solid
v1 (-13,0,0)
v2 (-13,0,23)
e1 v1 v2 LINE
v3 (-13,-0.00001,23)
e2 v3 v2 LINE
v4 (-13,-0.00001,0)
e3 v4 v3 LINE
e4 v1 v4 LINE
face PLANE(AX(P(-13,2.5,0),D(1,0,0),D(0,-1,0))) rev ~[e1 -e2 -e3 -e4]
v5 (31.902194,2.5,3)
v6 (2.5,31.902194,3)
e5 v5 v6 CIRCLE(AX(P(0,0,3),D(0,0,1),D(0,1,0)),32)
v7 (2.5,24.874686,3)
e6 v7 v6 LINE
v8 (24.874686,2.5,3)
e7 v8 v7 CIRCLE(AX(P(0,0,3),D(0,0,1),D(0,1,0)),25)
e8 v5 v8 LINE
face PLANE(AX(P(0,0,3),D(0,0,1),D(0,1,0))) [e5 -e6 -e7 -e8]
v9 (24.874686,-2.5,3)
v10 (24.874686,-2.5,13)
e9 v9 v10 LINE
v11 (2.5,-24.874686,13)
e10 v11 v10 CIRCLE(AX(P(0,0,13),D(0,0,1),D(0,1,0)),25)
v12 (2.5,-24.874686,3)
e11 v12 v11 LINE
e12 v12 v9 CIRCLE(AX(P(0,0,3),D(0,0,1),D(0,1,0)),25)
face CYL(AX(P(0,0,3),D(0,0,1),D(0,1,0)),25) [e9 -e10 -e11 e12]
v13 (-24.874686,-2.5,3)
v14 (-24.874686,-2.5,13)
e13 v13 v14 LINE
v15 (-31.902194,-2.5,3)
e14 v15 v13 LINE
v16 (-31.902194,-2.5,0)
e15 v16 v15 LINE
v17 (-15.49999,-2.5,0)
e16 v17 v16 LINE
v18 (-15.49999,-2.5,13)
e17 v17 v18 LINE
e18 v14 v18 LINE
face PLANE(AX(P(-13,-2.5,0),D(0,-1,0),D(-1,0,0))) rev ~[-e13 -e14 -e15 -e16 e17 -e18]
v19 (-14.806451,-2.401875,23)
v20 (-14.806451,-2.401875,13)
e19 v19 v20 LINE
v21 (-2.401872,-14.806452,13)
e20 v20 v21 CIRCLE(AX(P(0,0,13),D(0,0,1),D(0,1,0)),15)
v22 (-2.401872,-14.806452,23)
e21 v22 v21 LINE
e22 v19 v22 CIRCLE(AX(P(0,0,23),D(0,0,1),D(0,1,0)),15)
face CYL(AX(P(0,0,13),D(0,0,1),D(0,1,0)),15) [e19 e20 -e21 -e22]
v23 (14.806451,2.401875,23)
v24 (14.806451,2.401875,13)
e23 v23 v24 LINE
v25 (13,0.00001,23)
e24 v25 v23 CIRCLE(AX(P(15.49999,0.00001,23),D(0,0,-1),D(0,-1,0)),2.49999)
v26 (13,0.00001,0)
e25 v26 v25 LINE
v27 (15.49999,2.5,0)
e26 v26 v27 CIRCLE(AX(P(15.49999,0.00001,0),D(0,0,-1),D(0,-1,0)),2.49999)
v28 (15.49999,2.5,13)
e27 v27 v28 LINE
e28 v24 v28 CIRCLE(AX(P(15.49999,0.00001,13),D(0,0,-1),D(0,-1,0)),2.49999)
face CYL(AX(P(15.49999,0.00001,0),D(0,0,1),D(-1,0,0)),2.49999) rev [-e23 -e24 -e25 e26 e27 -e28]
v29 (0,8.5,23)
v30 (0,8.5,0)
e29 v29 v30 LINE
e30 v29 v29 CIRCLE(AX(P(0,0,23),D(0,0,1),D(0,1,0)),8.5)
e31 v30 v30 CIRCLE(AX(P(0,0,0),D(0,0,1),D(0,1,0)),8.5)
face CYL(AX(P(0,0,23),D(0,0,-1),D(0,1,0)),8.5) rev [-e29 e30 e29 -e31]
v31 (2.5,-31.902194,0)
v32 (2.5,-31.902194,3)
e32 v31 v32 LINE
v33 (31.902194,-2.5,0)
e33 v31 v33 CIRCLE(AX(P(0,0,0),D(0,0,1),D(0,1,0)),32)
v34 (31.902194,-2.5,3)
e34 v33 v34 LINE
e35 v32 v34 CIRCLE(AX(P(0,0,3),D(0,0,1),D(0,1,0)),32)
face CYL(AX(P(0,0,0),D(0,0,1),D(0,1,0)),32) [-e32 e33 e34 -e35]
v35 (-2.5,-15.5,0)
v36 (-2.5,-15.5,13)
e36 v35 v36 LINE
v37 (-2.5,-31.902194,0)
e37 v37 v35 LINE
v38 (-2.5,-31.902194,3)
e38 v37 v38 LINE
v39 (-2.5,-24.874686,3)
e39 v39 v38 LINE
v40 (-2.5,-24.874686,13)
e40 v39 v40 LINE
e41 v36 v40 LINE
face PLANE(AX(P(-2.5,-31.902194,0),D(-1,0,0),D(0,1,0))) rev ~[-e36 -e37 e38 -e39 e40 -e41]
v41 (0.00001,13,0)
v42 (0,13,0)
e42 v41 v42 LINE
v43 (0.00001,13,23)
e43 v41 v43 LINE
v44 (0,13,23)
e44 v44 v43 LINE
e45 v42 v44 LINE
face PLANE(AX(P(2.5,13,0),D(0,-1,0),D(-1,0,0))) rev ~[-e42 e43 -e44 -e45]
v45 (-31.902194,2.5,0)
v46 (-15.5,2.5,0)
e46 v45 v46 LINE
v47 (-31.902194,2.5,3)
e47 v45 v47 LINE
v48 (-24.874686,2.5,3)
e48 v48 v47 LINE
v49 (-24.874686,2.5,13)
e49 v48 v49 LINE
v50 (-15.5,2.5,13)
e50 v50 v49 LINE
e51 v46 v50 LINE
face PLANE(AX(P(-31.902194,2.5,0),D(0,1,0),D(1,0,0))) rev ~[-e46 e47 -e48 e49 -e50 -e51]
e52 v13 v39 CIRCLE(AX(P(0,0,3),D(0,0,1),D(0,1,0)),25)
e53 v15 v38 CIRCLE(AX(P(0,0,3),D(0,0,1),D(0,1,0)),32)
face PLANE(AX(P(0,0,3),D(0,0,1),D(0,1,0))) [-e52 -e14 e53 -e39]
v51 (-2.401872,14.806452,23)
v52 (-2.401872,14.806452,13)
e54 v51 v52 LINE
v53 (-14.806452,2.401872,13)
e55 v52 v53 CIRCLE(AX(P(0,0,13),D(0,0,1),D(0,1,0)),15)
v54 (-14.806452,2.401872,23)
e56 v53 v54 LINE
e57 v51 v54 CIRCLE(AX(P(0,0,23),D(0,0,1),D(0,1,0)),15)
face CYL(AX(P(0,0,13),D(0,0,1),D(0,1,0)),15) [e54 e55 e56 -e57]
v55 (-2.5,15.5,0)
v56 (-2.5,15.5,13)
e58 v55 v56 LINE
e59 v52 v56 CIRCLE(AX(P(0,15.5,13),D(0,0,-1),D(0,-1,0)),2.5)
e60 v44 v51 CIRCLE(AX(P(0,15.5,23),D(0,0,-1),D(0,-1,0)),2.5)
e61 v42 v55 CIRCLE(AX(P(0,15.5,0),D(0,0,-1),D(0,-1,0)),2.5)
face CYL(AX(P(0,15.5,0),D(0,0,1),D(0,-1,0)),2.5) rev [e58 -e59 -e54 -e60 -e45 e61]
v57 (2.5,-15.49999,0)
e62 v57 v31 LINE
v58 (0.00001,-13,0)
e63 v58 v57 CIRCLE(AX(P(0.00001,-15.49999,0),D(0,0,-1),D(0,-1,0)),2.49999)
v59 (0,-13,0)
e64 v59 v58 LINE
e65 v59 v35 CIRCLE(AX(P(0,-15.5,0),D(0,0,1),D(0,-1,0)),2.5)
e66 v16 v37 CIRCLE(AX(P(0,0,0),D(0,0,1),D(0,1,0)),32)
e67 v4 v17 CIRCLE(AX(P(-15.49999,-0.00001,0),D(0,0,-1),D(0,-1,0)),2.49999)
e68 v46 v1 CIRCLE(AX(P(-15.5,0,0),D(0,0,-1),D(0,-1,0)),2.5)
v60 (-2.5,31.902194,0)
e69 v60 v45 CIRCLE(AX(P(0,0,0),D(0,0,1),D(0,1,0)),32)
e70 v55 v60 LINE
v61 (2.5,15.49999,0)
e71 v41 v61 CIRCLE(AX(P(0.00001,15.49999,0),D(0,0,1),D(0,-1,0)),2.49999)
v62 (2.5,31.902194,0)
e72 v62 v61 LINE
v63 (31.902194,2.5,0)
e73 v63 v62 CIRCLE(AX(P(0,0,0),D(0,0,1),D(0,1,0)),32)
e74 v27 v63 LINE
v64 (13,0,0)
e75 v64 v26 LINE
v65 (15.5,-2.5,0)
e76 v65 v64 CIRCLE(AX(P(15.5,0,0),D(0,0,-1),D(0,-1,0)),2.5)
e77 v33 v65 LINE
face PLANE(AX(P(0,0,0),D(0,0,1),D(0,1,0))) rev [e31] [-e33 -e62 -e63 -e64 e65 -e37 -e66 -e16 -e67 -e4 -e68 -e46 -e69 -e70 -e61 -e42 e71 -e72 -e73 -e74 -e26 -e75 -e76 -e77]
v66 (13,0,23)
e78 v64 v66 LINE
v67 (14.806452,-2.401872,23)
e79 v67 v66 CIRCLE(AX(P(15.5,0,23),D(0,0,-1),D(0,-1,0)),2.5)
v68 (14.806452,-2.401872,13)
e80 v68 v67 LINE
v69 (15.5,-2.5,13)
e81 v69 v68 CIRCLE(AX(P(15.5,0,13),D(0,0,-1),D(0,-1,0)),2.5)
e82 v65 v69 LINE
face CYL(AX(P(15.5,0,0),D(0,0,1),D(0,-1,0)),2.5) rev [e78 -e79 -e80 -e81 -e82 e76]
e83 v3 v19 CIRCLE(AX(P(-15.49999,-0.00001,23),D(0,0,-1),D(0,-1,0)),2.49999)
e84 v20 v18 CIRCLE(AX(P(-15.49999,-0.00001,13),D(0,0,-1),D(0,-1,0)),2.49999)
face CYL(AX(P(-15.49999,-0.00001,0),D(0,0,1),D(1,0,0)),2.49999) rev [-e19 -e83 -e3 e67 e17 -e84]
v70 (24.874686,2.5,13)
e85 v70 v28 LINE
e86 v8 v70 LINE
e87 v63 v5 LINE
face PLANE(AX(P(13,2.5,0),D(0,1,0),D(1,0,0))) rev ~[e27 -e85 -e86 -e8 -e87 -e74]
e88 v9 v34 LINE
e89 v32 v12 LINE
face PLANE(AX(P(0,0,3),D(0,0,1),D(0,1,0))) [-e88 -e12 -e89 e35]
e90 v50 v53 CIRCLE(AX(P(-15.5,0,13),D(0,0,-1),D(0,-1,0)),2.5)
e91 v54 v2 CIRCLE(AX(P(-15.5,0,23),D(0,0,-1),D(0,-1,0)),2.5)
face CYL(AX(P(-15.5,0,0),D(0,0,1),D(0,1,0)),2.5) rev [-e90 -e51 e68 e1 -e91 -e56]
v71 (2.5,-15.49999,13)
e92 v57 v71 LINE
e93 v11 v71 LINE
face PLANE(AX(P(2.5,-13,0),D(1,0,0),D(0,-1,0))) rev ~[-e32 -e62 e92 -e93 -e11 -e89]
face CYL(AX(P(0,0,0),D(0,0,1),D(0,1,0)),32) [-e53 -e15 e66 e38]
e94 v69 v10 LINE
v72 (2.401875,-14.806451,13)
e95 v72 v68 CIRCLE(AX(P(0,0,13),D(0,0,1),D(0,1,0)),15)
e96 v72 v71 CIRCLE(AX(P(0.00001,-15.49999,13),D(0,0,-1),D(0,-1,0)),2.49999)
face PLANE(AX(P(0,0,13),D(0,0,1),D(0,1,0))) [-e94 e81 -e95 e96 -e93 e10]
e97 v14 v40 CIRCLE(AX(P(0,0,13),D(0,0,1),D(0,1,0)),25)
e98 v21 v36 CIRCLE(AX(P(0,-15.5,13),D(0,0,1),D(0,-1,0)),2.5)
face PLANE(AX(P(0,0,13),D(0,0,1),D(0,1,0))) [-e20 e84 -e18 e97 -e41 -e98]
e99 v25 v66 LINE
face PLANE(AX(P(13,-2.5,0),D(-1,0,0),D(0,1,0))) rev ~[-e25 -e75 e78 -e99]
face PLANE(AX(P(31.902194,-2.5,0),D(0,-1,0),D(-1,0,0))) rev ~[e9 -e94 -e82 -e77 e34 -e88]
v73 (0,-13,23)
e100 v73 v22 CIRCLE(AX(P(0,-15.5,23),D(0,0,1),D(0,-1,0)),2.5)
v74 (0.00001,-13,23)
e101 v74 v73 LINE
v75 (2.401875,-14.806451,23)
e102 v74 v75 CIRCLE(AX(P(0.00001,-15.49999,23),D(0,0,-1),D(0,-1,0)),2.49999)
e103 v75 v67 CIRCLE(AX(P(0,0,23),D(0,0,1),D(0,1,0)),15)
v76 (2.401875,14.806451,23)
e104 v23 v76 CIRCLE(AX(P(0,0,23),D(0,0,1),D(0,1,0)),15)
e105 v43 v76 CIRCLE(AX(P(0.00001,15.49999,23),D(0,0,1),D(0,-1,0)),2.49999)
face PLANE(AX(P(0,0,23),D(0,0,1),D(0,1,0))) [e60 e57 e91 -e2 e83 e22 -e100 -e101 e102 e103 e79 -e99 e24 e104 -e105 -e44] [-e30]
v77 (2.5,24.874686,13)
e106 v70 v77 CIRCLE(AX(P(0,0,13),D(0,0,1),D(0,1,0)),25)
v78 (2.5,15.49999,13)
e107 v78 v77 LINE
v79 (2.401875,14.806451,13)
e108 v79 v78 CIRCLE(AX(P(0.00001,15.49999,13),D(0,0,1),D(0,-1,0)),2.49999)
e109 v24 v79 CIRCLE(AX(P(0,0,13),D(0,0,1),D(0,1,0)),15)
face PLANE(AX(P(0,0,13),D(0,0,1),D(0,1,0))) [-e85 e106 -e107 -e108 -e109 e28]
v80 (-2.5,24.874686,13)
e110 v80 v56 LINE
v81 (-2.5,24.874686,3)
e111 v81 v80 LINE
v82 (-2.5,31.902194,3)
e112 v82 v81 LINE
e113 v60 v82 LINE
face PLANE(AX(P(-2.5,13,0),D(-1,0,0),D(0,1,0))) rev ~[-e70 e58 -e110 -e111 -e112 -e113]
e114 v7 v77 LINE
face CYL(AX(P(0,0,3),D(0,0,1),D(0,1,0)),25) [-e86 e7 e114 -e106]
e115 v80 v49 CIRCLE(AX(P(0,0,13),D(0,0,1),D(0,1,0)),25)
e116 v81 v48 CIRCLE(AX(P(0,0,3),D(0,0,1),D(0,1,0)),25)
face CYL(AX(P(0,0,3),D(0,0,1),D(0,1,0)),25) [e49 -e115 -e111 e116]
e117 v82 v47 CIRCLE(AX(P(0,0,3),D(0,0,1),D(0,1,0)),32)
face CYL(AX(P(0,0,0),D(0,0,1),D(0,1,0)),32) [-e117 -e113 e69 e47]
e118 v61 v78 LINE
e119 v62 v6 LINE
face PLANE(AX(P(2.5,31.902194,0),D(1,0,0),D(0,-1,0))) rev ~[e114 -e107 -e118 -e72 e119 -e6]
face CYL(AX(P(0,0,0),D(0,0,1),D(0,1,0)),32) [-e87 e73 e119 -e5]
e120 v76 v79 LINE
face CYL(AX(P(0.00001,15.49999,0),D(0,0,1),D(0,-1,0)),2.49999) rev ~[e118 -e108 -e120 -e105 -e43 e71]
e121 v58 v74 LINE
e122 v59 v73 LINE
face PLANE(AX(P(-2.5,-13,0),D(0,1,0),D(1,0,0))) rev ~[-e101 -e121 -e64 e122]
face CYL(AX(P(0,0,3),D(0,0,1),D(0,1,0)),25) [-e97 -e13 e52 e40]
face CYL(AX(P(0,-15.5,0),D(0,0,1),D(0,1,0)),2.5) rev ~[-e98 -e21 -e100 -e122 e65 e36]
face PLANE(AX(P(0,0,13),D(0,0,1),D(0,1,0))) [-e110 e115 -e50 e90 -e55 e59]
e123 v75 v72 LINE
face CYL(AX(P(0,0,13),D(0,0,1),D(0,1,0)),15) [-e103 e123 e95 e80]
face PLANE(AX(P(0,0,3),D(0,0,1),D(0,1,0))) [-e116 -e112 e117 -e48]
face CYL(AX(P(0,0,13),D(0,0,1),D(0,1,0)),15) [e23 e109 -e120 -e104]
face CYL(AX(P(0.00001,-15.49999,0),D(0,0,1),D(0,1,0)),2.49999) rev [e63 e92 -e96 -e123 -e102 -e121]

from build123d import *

# Parameters (mm, degrees)
F3_DEPTH = 23.001
F4_R     = 2.5
F4_R_2   = 2.49999


# Not quite as in the source:
# - a fillet or chamfer is up to 0.001 mm smaller than in the source, because OpenCascade refuses the exact size


with BuildPart() as f1:
    # F0 (on Right) → F1 (revolve)
    with BuildSketch(Plane.YZ):
        Polygon((8.5, 23), (8.5, 0), (32, 0), (32, 3), (25, 3), (25, 13), (15, 13), (15, 23), align=None)
    revolve(axis=Axis((0, 0, 31.7647196352), (0, 0, 1)))

    # F2 (on face) → F3 (cut, through all)
    with BuildSketch(Plane(origin=(0, 0, 0), x_dir=(1, 0, 0), z_dir=(0, 0, -1))):
        with BuildLine():
            Line((-2.5, 13), (2.5, 13))
            Line((2.5, 13), (2.5, 31.9021942819))
            ThreePointArc((2.5, 31.9021942819), (0, 32), (-2.5, 31.9021942819))
            Line((-2.5, 31.9021942819), (-2.5, 13))
        make_face()
        with BuildLine():
            ThreePointArc((32, 0), (31.9755392216, 1.2509562301), (31.9021942819, 2.5))
            Line((31.9021942819, 2.5), (13, 2.5))
            Line((13, 2.5), (13, -2.5))
            Line((13, -2.5), (31.9021942819, -2.5))
            ThreePointArc((31.9021942819, -2.5), (31.9755392216, -1.2509562301), (32, 0))
        make_face()
        with BuildLine():
            Line((-2.5, -13), (-2.5, -31.9021942819))
            ThreePointArc((-2.5, -31.9021942819), (0, -32), (2.5, -31.9021942819))
            Line((2.5, -31.9021942819), (2.5, -13))
            Line((2.5, -13), (-2.5, -13))
        make_face()
        with BuildLine():
            Line((-13, 2.5), (-31.9021942819, 2.5))
            ThreePointArc((-31.9021942819, 2.5), (-32, 0), (-31.9021942819, -2.5))
            Line((-31.9021942819, -2.5), (-13, -2.5))
            Line((-13, -2.5), (-13, 2.5))
        make_face()
    extrude(amount=-F3_DEPTH, mode=Mode.SUBTRACT)

    # F4 (call 1 of 8: OpenCascade refuses the feature's edges together)
    f4_edges = [f1.edges().sort_by_distance(p)[0] for p in [
        (-2.5, -13, 11.5),
    ]]
    fillet(f4_edges, radius=F4_R)

    # F4#2 (call 2 of 8) (radius 2.5 in the source; OpenCascade refuses exactly that, so slightly less here)
    f4_2_edges = [f1.edges().sort_by_distance(p)[0] for p in [
        (2.5, -13, 11.5),
    ]]
    fillet(f4_2_edges, radius=F4_R_2)

    # F4#3 (call 3 of 8)
    f4_3_edges = [f1.edges().sort_by_distance(p)[0] for p in [
        (13, -2.5, 11.5),
    ]]
    fillet(f4_3_edges, radius=F4_R)

    # F4#4 (call 4 of 8) (radius 2.5 in the source; OpenCascade refuses exactly that, so slightly less here)
    f4_4_edges = [f1.edges().sort_by_distance(p)[0] for p in [
        (13, 2.5, 11.5),
    ]]
    fillet(f4_4_edges, radius=F4_R_2)

    # F4#5 (call 5 of 8)
    f4_5_edges = [f1.edges().sort_by_distance(p)[0] for p in [
        (-2.5, 13, 11.5),
    ]]
    fillet(f4_5_edges, radius=F4_R)

    # F4#6 (call 6 of 8) (radius 2.5 in the source; OpenCascade refuses exactly that, so slightly less here)
    f4_6_edges = [f1.edges().sort_by_distance(p)[0] for p in [
        (2.5, 13, 11.5),
    ]]
    fillet(f4_6_edges, radius=F4_R_2)

    # F4#7 (call 7 of 8)
    f4_7_edges = [f1.edges().sort_by_distance(p)[0] for p in [
        (-13, 2.5, 11.5),
    ]]
    fillet(f4_7_edges, radius=F4_R)

    # F4#8 (call 8 of 8) (radius 2.5 in the source; OpenCascade refuses exactly that, so slightly less here)
    f4_8_edges = [f1.edges().sort_by_distance(p)[0] for p in [
        (-13, -2.5, 11.5),
    ]]
    fillet(f4_8_edges, radius=F4_R_2)


solid = f1.part
